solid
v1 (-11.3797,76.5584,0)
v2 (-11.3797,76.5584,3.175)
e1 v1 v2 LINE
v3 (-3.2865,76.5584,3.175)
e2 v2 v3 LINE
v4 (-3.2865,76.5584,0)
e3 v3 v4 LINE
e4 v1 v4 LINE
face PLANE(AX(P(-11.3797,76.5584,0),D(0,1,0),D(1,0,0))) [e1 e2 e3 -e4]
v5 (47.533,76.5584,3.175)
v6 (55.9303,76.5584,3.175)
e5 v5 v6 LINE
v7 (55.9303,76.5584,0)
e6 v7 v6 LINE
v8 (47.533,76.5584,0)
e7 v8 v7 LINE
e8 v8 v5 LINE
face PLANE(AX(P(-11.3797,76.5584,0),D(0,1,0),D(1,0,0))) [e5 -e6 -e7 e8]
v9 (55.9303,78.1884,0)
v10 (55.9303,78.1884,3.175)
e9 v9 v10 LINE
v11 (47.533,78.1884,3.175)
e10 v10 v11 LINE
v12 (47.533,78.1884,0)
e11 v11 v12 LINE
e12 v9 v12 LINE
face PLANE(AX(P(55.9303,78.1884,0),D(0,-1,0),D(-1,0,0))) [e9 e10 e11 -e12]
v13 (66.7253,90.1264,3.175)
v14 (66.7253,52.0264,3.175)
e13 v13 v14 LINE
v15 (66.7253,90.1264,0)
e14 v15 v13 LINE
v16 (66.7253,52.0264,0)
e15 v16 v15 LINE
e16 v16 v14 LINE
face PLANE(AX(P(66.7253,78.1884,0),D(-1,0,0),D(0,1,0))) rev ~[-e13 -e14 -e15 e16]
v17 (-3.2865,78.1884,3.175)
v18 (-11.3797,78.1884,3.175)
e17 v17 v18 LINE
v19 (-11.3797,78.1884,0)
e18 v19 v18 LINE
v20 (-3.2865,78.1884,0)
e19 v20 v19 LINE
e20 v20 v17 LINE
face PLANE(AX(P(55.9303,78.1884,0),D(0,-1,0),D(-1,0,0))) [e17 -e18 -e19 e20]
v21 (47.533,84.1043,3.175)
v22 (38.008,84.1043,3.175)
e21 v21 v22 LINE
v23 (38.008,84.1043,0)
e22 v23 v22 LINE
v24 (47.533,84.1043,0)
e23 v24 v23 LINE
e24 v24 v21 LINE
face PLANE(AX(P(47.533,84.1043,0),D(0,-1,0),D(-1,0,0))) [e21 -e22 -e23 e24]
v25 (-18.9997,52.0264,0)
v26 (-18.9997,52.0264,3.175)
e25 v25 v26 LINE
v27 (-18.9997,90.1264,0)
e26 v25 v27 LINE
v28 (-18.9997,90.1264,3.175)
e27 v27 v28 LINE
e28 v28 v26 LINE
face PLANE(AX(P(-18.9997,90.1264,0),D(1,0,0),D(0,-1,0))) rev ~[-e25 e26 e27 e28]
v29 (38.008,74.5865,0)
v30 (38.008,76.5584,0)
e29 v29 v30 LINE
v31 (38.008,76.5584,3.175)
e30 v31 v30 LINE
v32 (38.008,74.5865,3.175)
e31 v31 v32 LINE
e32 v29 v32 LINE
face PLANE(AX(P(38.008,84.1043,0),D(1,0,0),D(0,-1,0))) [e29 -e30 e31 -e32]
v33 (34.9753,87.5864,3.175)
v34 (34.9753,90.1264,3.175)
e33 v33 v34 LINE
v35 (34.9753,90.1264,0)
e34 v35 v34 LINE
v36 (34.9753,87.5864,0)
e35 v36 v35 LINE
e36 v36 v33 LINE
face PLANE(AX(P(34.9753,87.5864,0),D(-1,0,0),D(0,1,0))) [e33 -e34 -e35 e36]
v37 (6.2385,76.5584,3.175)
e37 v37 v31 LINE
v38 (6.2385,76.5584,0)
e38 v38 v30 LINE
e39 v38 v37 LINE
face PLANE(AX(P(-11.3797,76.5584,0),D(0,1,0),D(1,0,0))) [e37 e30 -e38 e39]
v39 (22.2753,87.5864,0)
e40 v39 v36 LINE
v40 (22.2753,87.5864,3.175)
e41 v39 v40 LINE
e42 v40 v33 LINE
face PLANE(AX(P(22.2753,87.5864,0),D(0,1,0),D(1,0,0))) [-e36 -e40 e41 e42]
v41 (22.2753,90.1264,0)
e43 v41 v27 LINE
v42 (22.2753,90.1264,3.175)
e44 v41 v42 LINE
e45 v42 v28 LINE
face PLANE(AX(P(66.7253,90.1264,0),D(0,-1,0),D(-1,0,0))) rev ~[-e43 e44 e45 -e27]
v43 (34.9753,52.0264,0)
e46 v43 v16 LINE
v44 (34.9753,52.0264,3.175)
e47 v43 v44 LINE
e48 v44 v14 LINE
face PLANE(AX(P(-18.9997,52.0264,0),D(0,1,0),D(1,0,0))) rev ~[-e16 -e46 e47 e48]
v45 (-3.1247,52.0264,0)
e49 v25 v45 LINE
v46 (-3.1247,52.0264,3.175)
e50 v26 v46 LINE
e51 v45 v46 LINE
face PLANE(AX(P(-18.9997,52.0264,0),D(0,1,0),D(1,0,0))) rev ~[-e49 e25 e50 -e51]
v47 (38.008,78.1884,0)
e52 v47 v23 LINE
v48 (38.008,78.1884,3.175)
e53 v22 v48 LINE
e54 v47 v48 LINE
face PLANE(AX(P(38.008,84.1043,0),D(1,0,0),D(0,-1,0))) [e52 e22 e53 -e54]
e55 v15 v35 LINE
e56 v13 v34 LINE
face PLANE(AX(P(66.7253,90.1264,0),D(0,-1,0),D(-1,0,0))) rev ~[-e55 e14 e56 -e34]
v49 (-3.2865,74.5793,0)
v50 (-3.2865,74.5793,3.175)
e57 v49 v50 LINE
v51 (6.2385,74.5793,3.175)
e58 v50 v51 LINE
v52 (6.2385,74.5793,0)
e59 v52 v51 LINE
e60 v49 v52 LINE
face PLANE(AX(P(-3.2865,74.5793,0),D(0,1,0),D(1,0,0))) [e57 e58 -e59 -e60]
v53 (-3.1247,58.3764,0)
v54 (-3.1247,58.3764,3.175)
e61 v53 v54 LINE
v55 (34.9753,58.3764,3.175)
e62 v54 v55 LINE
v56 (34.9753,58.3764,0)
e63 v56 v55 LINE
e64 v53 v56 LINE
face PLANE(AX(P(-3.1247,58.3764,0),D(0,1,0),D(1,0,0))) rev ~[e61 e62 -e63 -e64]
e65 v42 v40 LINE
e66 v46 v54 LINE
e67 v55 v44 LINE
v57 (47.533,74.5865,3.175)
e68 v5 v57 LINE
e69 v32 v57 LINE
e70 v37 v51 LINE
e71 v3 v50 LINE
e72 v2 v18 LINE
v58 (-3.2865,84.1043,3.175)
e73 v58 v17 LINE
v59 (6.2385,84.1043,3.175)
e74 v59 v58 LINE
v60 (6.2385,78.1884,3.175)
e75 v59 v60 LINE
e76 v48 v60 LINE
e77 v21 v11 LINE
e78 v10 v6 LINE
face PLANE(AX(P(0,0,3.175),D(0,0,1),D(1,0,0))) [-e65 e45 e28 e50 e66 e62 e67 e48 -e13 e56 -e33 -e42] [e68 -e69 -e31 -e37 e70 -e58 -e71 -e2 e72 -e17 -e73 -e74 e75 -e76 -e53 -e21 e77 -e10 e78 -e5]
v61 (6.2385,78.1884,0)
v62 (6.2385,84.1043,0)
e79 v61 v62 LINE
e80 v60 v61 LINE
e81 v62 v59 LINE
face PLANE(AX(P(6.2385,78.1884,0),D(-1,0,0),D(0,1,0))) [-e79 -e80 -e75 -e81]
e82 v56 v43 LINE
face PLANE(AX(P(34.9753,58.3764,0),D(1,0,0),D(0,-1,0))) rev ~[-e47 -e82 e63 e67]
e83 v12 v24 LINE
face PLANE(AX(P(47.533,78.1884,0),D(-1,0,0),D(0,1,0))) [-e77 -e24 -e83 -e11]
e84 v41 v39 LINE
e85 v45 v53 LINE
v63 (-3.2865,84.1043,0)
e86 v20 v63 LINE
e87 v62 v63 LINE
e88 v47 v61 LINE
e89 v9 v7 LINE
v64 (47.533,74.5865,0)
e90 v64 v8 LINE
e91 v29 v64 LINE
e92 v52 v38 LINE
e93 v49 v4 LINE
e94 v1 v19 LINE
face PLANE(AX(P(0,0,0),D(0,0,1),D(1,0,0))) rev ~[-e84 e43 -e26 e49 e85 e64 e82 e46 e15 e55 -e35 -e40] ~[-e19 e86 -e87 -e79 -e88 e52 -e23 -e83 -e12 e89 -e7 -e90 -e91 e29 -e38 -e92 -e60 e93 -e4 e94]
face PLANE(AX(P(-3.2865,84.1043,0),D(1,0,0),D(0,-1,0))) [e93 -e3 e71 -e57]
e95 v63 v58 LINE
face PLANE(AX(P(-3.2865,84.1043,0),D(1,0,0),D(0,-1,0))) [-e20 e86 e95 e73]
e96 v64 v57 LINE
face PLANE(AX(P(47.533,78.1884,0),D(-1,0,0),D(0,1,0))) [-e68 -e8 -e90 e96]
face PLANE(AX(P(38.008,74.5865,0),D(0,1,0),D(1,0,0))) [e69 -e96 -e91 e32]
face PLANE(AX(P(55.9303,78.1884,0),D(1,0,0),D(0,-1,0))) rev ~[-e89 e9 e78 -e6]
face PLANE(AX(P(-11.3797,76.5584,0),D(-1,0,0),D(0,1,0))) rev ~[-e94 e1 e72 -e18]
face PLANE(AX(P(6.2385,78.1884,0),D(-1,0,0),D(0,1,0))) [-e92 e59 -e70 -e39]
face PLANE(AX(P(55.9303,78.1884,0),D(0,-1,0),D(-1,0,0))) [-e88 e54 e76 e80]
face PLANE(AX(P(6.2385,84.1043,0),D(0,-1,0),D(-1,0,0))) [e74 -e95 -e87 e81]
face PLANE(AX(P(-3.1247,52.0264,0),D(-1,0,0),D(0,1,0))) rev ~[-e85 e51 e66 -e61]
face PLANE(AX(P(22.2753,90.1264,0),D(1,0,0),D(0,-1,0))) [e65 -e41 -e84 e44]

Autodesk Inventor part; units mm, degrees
ref_plane "YZ Plane" through (0, 0, 0) normal (1, 0, 0) x (0, 1, 0)
ref_plane "XZ Plane" through (0, 0, 0) normal (0, 1, 0) x (-1, 0, 0)
ref_plane "XY Plane" through (0, 0, 0) normal (0, 0, 1) x (1, 0, 0)
sketch "Sketch1" plane through (0, 0, 0) normal (0, 0, 1) x (1, 0, 0)
  line L0 (66.7253, 90.1264) -> (-18.9997, 90.1264)
  line L1 (-18.9997, 90.1264) -> (-18.9997, 52.0264)
  line L2 (-18.9997, 52.0264) -> (66.7253, 52.0264)
  line L3 (66.7253, 52.0264) -> (66.7253, 90.1264)
  line L4 (66.7253, 78.1884) -> (-18.9997, 78.1884)
  line L5 (-18.9997, 78.1884) -> (-18.9997, 76.5584)
  line L6 (-18.9997, 76.5584) -> (66.7253, 76.5584)
  line L7 (66.7253, 76.5584) -> (66.7253, 78.1884)
  line L8 (55.9303, 78.1884) -> (55.9303, 76.5584)
  line L9 (-11.3797, 76.5584) -> (-11.3797, 78.1884)
  point P0 (0, 0)
  dimension "d0" = 38.1
  dimension "d1" = 85.725
  dimension "d2" = 1.63
  dimension "d3" = 11.938
  dimension "d6" = 67.31
  dimension "d7" = 7.62
extrude "Extrusion1" add sketch "Sketch1" along normal blind 3.175 contours L3 L4 L1 L0 | L3 L6 L8 L4 | L4 L9 L6 L1 | L3 L2 L1 L6
sketch "Sketch2" plane through (0, 0, 0) normal (0, 0, -1) x (-1, 0, 0)
  line L0 (-55.9303, 78.1884) -> (11.3797, 78.1884) projected
  line L1 (11.3797, 78.1884) -> (11.3797, 76.5584) projected
  line L2 (-6.2385, 84.1043) -> (3.2865, 84.1043)
  line L3 (3.2865, 84.1043) -> (3.2865, 74.5793)
  line L4 (3.2865, 74.5793) -> (-6.2385, 74.5793)
  line L5 (-6.2385, 74.5793) -> (-6.2385, 84.1043)
  line L6 (-47.533, 84.1043) -> (-38.008, 84.1043)
  line L7 (-38.008, 84.1043) -> (-38.008, 74.5865)
  line L8 (-38.008, 74.5865) -> (-47.533, 74.5865)
  line L9 (-47.533, 74.5865) -> (-47.533, 84.1043)
  line L10 (18.9997, 52.0264) -> (-66.7253, 52.0264) projected
  line L11 (-34.9753, 52.0264) -> (3.1247, 52.0264)
  line L12 (3.1247, 52.0264) -> (3.1247, 58.3764)
  line L13 (3.1247, 58.3764) -> (-34.9753, 58.3764)
  line L14 (-34.9753, 58.3764) -> (-34.9753, 52.0264)
  line L15 (-66.7253, 52.0264) -> (-66.7253, 90.1264) projected
  line L16 (-66.7253, 90.1264) -> (18.9997, 90.1264) projected
  line L17 (-34.9753, 90.1264) -> (-22.2753, 90.1264)
  line L18 (-22.2753, 90.1264) -> (-22.2753, 87.5864)
  line L19 (-22.2753, 87.5864) -> (-34.9753, 87.5864)
  line L20 (-34.9753, 87.5864) -> (-34.9753, 90.1264)
  point P0 (0, 0)
  dimension "d8" = 9.525
  dimension "d9" = 9.5177
  dimension "d10" = 9.525
  dimension "d11" = 9.525
  dimension "d12" = 31.7695
  dimension "d13" = 5.9159
  dimension "d14" = 8.0932
  dimension "d17" = 6.35
  dimension "d18" = 38.1
  dimension "d20" = 2.54
  dimension "d21" = 12.7
  dimension "d22" = 31.75
  dimension "d23" = 31.75
extrude "Extrusion2" cut sketch "Sketch2" against normal blind 3.175
properties part number "RearBulkhead"
